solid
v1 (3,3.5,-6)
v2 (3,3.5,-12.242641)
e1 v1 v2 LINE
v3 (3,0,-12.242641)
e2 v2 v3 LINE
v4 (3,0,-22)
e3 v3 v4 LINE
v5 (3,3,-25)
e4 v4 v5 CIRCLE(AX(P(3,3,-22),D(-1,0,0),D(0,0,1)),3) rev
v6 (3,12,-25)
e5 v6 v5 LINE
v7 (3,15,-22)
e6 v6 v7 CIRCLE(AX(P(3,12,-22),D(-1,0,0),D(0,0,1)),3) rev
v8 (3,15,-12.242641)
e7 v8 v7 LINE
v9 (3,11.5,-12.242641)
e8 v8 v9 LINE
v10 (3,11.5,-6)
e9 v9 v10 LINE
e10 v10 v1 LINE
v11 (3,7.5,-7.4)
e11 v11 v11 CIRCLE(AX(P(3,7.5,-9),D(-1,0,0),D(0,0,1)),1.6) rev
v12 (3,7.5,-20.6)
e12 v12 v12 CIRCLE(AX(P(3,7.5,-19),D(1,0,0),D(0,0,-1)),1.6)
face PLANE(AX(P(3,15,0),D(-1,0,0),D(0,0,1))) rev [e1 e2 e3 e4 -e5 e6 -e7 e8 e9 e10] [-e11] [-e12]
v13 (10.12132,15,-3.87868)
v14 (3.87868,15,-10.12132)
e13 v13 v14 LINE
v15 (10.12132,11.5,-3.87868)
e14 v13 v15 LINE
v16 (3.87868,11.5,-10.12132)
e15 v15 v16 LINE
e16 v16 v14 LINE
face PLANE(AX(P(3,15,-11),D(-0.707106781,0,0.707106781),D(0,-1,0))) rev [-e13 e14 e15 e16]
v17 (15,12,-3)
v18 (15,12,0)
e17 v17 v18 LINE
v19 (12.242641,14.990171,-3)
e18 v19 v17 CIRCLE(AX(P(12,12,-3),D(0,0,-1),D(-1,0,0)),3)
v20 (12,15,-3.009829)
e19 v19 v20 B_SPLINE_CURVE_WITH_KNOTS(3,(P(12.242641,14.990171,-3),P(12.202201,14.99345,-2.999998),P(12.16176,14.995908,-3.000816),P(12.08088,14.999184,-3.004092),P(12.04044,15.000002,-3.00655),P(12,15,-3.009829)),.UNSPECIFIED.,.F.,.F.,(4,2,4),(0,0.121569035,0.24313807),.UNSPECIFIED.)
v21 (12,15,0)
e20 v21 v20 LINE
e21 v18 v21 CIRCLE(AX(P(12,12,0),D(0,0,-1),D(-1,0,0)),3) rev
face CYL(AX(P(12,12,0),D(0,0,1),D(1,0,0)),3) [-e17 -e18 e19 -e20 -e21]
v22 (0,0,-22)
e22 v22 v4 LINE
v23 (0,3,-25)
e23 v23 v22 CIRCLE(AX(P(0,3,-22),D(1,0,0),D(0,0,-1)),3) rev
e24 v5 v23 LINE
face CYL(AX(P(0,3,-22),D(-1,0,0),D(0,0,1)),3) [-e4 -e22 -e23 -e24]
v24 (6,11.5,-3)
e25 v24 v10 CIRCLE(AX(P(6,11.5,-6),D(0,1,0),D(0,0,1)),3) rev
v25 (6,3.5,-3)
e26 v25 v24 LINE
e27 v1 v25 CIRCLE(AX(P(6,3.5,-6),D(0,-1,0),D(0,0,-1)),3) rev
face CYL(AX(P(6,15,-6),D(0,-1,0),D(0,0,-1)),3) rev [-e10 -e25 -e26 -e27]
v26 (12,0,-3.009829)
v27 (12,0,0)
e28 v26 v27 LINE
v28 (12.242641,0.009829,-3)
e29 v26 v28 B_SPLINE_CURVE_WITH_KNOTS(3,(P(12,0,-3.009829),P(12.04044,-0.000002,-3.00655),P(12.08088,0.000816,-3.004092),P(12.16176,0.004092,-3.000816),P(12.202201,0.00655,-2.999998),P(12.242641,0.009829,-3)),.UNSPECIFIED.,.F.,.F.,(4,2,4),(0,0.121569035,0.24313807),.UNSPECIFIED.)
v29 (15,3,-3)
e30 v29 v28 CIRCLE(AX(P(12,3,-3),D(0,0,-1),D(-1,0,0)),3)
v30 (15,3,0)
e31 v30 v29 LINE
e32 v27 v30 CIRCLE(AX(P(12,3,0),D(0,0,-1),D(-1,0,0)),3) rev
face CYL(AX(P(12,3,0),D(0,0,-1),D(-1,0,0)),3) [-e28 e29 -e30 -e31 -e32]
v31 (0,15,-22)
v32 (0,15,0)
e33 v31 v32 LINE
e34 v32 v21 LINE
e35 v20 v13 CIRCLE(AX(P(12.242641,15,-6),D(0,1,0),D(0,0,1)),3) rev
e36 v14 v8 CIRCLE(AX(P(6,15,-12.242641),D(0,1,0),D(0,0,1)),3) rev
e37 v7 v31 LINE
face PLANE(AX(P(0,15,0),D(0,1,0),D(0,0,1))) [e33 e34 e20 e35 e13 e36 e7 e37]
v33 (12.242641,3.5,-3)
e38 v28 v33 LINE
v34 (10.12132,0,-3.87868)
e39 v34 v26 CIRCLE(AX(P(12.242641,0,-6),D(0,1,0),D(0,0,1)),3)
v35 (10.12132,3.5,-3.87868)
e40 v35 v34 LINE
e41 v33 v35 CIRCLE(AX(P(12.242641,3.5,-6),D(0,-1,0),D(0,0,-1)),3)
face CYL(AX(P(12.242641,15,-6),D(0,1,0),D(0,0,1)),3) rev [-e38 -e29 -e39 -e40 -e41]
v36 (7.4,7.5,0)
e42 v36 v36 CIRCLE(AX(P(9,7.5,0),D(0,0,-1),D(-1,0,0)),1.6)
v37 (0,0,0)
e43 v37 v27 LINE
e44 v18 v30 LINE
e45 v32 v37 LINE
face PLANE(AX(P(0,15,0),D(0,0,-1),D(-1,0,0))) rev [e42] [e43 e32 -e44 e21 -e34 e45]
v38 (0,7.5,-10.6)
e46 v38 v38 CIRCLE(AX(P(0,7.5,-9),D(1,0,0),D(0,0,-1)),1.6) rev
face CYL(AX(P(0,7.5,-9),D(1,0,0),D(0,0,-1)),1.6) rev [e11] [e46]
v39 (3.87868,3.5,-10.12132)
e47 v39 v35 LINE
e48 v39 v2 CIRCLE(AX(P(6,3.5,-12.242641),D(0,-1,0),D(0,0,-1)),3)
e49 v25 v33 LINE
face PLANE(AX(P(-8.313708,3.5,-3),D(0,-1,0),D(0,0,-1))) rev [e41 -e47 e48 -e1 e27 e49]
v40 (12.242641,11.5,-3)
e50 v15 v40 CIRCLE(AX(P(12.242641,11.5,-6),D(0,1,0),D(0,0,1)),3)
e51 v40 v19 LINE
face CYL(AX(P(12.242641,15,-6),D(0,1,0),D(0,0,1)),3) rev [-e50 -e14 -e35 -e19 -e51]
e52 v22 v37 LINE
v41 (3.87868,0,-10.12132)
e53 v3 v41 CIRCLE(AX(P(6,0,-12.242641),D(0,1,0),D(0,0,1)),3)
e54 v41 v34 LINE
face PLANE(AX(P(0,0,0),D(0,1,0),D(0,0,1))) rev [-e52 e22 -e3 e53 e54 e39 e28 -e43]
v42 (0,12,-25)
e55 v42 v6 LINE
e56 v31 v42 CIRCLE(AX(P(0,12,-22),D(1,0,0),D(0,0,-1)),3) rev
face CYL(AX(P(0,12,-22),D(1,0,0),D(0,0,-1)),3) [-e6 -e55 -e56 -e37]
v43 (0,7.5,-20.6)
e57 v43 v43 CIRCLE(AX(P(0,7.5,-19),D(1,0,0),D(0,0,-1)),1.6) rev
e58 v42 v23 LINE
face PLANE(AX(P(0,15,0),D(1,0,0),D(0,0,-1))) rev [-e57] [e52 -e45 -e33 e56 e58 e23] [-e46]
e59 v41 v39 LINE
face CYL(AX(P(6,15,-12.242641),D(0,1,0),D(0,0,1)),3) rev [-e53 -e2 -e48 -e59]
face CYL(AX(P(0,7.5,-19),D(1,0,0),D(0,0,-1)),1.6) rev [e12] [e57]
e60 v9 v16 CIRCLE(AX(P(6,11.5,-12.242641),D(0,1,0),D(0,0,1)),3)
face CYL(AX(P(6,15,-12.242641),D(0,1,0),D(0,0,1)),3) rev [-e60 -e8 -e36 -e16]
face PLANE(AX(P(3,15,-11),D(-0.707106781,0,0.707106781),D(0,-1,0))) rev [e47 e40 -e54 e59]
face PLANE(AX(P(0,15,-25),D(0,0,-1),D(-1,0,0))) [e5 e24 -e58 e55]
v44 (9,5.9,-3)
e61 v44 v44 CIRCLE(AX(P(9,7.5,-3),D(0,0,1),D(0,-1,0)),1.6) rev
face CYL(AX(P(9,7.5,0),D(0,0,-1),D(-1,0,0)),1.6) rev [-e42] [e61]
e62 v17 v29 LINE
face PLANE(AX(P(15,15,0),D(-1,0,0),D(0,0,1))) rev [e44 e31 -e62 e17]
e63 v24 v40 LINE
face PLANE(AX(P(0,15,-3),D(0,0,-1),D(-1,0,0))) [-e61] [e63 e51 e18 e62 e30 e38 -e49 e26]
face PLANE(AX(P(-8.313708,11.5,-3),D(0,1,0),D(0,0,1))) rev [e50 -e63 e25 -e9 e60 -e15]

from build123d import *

# Parameters (mm, degrees)
SKETCH1_W           = 3
SKETCH1_H           = 22
SKETCH1_H_2         = 3
SKETCH1_W_2         = 12
BOSS_EXTRUDE1_DEPTH = 15
SKETCH2_R           = 1.6
CUT_EXTRUDE1_DEPTH  = 31.56141358
SKETCH3_R           = 1.6
CUT_EXTRUDE2_DEPTH  = 32.527765541
FILLET1_R           = 3
CHAMFER1_SIZE       = 8
SKETCH6_W           = 8
SKETCH6_H           = 8
CUT_EXTRUDE5_DEPTH  = 12
FILLET2_R           = 3
SKETCH7_W           = 15
SKETCH7_H           = 25
CUT_EXTRUDE6_DEPTH  = 33.787192713


with BuildPart() as part:
    # Sketch1 → Boss-Extrude1 (new body)
    with BuildSketch(Plane(origin=(0, 0, 0), x_dir=(1, 0, 0), z_dir=(0, 1, 0))):
        with Locations((1.5, 14)):
            Rectangle(SKETCH1_W, SKETCH1_H)
        with Locations((1.5, 1.5)):
            Rectangle(SKETCH1_W, SKETCH1_H_2)
        with Locations((9, 1.5)):
            Rectangle(SKETCH1_W_2, SKETCH1_H_2)
    extrude(amount=BOSS_EXTRUDE1_DEPTH)

    # Sketch2 → Cut-Extrude1 (cut, through all)
    with BuildSketch(Plane(origin=(0, 0, -3), x_dir=(-1, 0, 0), z_dir=(0, 0, -1))):
        with Locations((-9, 7.5)):
            Circle(SKETCH2_R)
    extrude(amount=-CUT_EXTRUDE1_DEPTH, mode=Mode.SUBTRACT)

    # Sketch3 → Cut-Extrude2 (cut, through all)
    with BuildSketch(Plane(origin=(3, 0, 0), x_dir=(0, 0, -1), z_dir=(1, 0, 0))):
        with Locations((9, 7.5)):
            Circle(SKETCH3_R)
        with Locations((19, 7.5)):
            Circle(SKETCH3_R)
    extrude(amount=-CUT_EXTRUDE2_DEPTH, mode=Mode.SUBTRACT)

    # Fillet1
    fillet1_edges = [part.edges().sort_by_distance(p)[0] for p in [
        (15, 15, -1.5),
        (1.5, 15, -25),
        (1.5, 0, -25),
        (15, 0, -1.5),
    ]]
    fillet(fillet1_edges, radius=FILLET1_R)

    # Chamfer1
    # the kernel refuses this chamfer: 8 mm, written as the material it adds along each edge
    with BuildSketch(Plane(origin=(3, 0, -3), x_dir=(-0.027495876610586382, 0, -0.9996219169112968), z_dir=(0, 1, 0))) as chamfer1_piece_1_section:
        Polygon((CHAMFER1_SIZE * 0.999621916911, -CHAMFER1_SIZE * 0.0274958766106), (-CHAMFER1_SIZE * 0.0274958766106, -CHAMFER1_SIZE * 0.999621916911), (0, 0), align=None)
    chamfer1_piece_1 = extrude(amount=15, mode=Mode.PRIVATE)
    chamfer1_piece_1 = chamfer1_piece_1 - Plane(origin=(5.584357769, 7.5, -9), x_dir=(0, 0, -1), z_dir=(1, 0, 0)) * Cylinder(1.6, 62, mode=Mode.PRIVATE)
    chamfer1_piece_1 = chamfer1_piece_1 - Plane(origin=(9, 7.5, -5.584358399), x_dir=(-1, 0, 0), z_dir=(0, 0, -1)) * Cylinder(1.6, 62, mode=Mode.PRIVATE)
    add(chamfer1_piece_1)

    # Sketch6 → Cut-Extrude5 (cut)
    with BuildSketch(Plane(origin=(15, 0, 0), x_dir=(0, 0, -1), z_dir=(1, 0, 0))):
        with Locations((7, 7.5)):
            Rectangle(SKETCH6_W, SKETCH6_H)
    extrude(amount=-CUT_EXTRUDE5_DEPTH, mode=Mode.SUBTRACT)

    # Fillet2
    fillet2_edges = [part.edges().sort_by_distance(p)[0] for p in [
        (3, 7.5, -3),
        (11, 1.75, -3),
        (3, 1.75, -11),
        (3, 13.25, -11),
        (11, 13.25, -3),
    ]]
    fillet(fillet2_edges, radius=FILLET2_R)

    # Mirror3: part across plane


with BuildPart() as part_1:
    add(part.part)
    add(part.part.mirror(Plane(origin=(0, 15, 0), x_dir=(0, 0, 1), z_dir=(-1, 0, 0))))

    # Sketch7 → Cut-Extrude6 (cut, through all)
    with BuildSketch(Plane.XZ):
        with Locations((-7.5, -12.5)):
            Rectangle(SKETCH7_W, SKETCH7_H)
    extrude(amount=-CUT_EXTRUDE6_DEPTH, mode=Mode.SUBTRACT)


solid = part_1.part
